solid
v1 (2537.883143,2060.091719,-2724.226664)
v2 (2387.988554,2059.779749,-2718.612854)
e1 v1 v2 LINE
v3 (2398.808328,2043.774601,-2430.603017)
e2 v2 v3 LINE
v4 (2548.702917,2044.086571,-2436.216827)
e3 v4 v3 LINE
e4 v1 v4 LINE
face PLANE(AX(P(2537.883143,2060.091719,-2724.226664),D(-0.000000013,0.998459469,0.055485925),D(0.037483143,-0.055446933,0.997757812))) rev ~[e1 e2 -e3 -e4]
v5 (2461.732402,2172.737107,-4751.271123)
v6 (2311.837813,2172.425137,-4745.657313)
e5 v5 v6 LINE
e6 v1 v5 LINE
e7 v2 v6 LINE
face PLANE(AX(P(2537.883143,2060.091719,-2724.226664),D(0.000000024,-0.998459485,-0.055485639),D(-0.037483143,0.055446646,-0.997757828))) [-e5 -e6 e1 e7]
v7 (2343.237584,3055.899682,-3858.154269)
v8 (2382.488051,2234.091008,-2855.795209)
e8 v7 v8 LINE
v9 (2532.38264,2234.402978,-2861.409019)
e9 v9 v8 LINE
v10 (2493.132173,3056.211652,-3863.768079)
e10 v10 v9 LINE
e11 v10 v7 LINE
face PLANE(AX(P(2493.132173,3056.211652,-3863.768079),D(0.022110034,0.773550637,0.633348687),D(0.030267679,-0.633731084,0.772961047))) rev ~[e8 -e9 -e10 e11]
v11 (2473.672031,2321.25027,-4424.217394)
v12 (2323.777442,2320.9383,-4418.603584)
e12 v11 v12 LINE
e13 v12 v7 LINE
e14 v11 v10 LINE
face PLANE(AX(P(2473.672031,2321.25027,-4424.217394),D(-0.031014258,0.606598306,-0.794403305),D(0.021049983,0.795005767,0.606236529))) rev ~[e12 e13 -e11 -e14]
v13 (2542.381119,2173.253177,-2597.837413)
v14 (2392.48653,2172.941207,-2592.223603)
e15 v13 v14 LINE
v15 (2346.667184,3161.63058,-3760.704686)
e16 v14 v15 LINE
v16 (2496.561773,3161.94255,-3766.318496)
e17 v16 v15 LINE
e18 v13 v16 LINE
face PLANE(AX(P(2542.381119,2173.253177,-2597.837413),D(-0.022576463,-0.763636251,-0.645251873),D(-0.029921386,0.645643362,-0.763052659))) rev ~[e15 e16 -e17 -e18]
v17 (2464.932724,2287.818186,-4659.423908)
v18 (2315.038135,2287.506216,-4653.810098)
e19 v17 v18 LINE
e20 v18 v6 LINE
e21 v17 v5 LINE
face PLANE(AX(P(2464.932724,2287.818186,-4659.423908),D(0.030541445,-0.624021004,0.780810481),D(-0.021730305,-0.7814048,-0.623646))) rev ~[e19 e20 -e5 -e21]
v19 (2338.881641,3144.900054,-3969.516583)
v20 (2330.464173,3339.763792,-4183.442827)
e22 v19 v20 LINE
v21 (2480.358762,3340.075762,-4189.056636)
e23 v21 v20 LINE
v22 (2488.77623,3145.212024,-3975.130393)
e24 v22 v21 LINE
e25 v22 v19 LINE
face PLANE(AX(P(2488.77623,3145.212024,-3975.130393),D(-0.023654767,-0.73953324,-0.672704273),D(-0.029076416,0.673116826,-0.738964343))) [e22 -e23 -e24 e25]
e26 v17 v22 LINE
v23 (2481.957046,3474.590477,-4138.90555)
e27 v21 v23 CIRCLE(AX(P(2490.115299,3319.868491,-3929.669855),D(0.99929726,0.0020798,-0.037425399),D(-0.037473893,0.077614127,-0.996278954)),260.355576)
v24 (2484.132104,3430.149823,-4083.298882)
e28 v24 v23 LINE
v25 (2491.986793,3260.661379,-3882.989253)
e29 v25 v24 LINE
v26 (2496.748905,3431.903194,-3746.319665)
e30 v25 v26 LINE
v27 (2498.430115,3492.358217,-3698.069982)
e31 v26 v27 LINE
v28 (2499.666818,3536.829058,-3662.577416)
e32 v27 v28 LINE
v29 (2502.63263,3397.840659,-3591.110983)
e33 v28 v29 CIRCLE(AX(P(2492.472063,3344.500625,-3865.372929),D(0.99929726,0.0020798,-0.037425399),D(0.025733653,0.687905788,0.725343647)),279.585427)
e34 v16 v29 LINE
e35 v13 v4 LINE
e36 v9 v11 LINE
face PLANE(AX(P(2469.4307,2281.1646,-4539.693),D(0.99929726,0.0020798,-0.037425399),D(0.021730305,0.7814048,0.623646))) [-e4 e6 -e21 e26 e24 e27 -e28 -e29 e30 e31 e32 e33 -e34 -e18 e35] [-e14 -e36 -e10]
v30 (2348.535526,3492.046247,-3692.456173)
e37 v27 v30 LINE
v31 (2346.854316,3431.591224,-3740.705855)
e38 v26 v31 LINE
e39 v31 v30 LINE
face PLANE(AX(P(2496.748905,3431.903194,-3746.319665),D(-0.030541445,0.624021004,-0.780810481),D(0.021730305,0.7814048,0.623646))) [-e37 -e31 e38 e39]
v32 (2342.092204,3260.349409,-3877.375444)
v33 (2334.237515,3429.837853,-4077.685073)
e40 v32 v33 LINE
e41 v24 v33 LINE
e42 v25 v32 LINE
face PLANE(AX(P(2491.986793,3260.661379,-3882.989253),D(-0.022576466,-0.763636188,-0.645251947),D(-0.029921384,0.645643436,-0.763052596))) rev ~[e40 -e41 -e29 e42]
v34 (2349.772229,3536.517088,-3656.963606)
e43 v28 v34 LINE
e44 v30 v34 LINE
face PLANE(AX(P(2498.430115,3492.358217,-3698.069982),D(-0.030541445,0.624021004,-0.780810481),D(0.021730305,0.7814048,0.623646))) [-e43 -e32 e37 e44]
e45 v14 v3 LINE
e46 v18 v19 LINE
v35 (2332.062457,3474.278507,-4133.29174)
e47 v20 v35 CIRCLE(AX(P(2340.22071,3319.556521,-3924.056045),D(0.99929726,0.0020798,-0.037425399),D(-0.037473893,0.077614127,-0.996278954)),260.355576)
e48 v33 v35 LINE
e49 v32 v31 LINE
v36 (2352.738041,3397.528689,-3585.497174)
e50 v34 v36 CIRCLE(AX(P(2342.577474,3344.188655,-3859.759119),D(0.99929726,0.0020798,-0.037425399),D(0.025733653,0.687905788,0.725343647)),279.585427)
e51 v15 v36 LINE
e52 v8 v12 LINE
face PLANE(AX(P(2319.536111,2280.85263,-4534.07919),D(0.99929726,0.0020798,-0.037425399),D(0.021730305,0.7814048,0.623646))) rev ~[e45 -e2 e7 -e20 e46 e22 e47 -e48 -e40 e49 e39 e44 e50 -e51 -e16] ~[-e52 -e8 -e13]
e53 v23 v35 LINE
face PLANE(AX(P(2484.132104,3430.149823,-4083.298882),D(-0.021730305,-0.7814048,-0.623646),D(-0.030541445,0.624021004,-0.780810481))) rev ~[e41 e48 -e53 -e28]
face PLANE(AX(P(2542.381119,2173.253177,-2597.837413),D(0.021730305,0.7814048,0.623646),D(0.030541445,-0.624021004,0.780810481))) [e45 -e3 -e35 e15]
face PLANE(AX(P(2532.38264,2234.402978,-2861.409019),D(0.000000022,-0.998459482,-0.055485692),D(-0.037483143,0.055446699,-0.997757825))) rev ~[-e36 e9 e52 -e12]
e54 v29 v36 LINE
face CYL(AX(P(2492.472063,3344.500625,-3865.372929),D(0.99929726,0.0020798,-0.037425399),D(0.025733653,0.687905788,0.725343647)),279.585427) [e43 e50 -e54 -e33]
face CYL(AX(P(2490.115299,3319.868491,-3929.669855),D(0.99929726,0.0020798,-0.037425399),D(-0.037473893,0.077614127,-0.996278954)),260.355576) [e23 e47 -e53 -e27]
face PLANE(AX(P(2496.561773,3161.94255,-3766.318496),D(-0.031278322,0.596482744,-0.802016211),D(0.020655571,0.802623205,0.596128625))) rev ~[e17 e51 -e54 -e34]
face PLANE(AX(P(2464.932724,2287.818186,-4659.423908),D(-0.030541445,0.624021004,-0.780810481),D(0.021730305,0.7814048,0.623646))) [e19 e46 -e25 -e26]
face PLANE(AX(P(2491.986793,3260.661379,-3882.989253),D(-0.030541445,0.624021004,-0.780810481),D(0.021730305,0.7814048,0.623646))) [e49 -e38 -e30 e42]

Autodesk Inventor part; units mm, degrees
sketch "Sketch1" plane through (0, 0, 0) normal (0, 0, 1) x (1, 0, 0)
  arc A0 (4796.3585, -1909.6289) -> (3343.4744, 1121.5056) centre (-3903.1767, -4215.7265) ccw
  line L0 (3236.8192, 1046.7661) -> (3343.5051, 1121.464)
  arc A1 (3228.7635, 1285.3391) -> (1546.1726, 3076.3751) centre (-4110.5601, -3923.7232) ccw
  line L1 (3228.7635, 1285.3391) -> (3122.0787, 1210.6419)
  line L2 (1372.9503, 3176.3452) -> (1308.1705, 3064.1503)
  arc A2 (1372.9503, 3176.3452) -> (93.8576, 4024.2684) centre (-4221.2651, -3873.8147) ccw
  line L3 (1481.3729, 2964.1457) -> (1546.1726, 3076.3751)
  arc A3 (4543.4821, -2147.4888) -> (93.8528, 3844.2289) centre (-4256.4671, -4034.5221) ccw
  line L4 (93.8576, 4024.2684) -> (93.8528, 3844.2289)
  line L5 (1308.1705, 3064.1503) -> (1481.3729, 2964.1457)
  line L6 (3122.0787, 1210.6419) -> (3236.8192, 1046.7661)
  arc A4 (4543.4821, -2147.4888) -> (4796.3585, -1909.6289) centre (4134.8595, -1459.7188) ccw
  point P0 (0, 0)
  dimension "d7" = 800
ref_plane "Work Plane2" through (0, 0, -8101) normal (0, 0, 1) x (1, 0, 0)
ref_plane "Work Plane1" through (0, 0, 0) normal (0, 0, 1) x (1, 0, 0)
sketch "Sketch2" plane through (0, 0, -8101) normal (0, 0, 1) x (1, 0, 0)
  arc A0 (1192.0552, 3508.338) -> (93.8528, 4294.485) centre (-5164.5547, -4211.3454) ccw projected
  arc A1 (3133.8513, 1483.0798) -> (1365.2603, 3408.338) centre (-5051.6105, -4261.3276) ccw projected
  arc A2 (4543.6426, -2147.8414) -> (93.8528, 4114.0508) centre (-5207.4444, -4365.1147) ccw projected
  line L0 (1192.0552, 3508.338) -> (1126.9741, 3395.6142) projected
  line L1 (1365.2603, 3408.338) -> (1300.1792, 3295.6142) projected
  line L2 (1126.9741, 3395.6142) -> (1300.1792, 3295.6142) projected
  line L3 (93.8528, 4294.485) -> (93.8528, 4114.0508) projected
  line L4 (3027.6129, 1408.6909) -> (3133.8513, 1483.0798) projected
  line L5 (3142.3282, 1244.8605) -> (3248.5665, 1319.2494) projected
  line L6 (3027.6129, 1408.6909) -> (3142.3282, 1244.8605) projected
  arc A3 (4803.6655, -1899.2732) -> (3248.5665, 1319.2494) centre (-4832.968, -4570.4704) ccw projected
  arc A4 (4543.6426, -2147.8414) -> (4803.6655, -1899.2732) centre (4135.0016, -1460.0824) ccw projected
  point P0 (0, 0)
loft "Loft1" add profiles "Sketch1", "Sketch2"
ref_plane "Work Plane3" through (2600, 0, 0) normal (1, 0, 0) x (0, 1, 0)
sketch "Sketch3" plane through (2600, 0, 0) normal (1, 0, 0) x (0, 1, 0)
  line L0 (3120.8038, -3828.6818) -> (2179.9067, -2717.5683)
  line L1 (2179.9067, -2717.5683) -> (2281.1646, -4539.693)
  line L2 (2281.1646, -4539.693) -> (3120.8038, -3828.6818)
  line L3 (4534.6211, 332.5956) -> (-2270.5383, 332.5956)
  line L4 (-2270.5383, 332.5956) -> (-2270.5383, -8394.1003)
  line L5 (-2270.5383, -8394.1003) -> (4534.6211, -8394.1003)
  line L6 (4534.6211, -8394.1003) -> (4534.6211, 332.5956)
  point P0 (0, 0)
extrude "Extrusion1" cut sketch "Sketch3" along normal through all both and the other way through all
sketch "Sketch5" plane through (2219.0112, 2281.1646, -4539.693) normal (0, -0.9984595, -0.0554857) x (1, 0, 0)
  line L0 (318.8718, 1824.936) -> (250.4195, 0)
  point P0 (-2219.0112, 4659.2715)
ref_plane "Work Plane4" through (2537.8831, 2179.9067, -2717.5683) normal (-0.6423359, -0.7662012, -0.0184479) x (-0.0374831, 0.0554467, -0.9977578)
sketch "Sketch6" plane through (2537.8831, 2179.9067, -2717.5683) normal (-0.6423359, -0.7662012, -0.0184479) x (-0.0374831, 0.0554467, -0.9977578)
  line L0 (-729.0595, -1938.3665) -> (2085.591, -1938.3665)
  line L1 (2085.591, -1938.3665) -> (2085.591, 179.9667)
  line L2 (2085.591, 179.9667) -> (-729.0595, 179.9667)
  line L3 (-729.0595, 179.9667) -> (-729.0595, -1938.3665)
  point P0 (-2737.216, -722.0143)
extrude "Extrusion2" cut sketch "Sketch6" against normal through all
ref_plane "Work Plane5" through (2537.8831, 2179.9067, -2717.5683) normal (-0.9992973, -0.0020798, 0.0374254) x (-0.0374831, 0.0554467, -0.9977578)
sketch "Sketch7" plane through (2537.8831, 2179.9067, -2717.5683) normal (-0.9992973, -0.0020798, 0.0374254) x (-0.0374831, 0.0554467, -0.9977578)
  line L0 (1826.2193, 0) -> (0, 0) projected
  line L1 (1201.6643, -877.7967) -> (1826.2193, 0) projected
  line L2 (0, 0) -> (1201.6643, -877.7967) projected
  point P0 (-2737.216, 2025.7624)
sketch "Sketch8" plane through (2537.8831, 2179.9067, -2717.5683) normal (-0.6423359, -0.7662012, -0.0184479) x (-0.0374831, 0.0554467, -0.9977578)
  line L0 (1826.2193, 0) -> (0, 0) projected
  line L1 (1201.6643, -1365.6093) -> (1826.2193, 0) projected
  line L2 (0, 0) -> (1201.6643, -1365.6093) projected
  point P0 (-2737.216, -722.0143)
loft "Loft2" add profiles "Sketch7" section 1 edges at (2503.6569, 2230.5357, -3628.6306) (1958.4447, 2700.9842, -4184.1874) (1992.6709, 2650.3553, -3273.125)
sketch "Sketch9" plane through (2537.8831, 2179.9067, -2717.5683) normal (0.9992973, 0.0020798, -0.0374254) x (-0.0374831, 0.0554467, -0.9977578)
  line L0 (1201.6643, 877.7967) -> (0, 0) projected
  line L1 (1826.2193, 0) -> (0, 0) projected
  line L2 (1826.2193, 0) -> (1201.6643, 877.7967) projected
  point P0 (-2737.216, -2025.7624)
ref_plane "Work Plane6" through (2469.4307, 2281.1646, -4539.693) normal (0.9992973, 0.0020798, -0.0374254) x (0.0217303, 0.7814048, 0.623646)
sketch "Sketch10" plane through (2469.4307, 2281.1646, -4539.693) normal (0.9992973, 0.0020798, -0.0374254) x (0.0217303, 0.7814048, 0.623646)
  line L0 (1578.0672, -786.8916) -> (-983.5577, -786.8916)
  line L1 (-983.5577, -786.8916) -> (-983.5577, 1970.9014)
  line L2 (-983.5577, 1970.9014) -> (1578.0672, 1970.9014)
  line L3 (1578.0672, 1970.9014) -> (1578.0672, -786.8916)
  point P0 (994.987, 4892.7146)
extrude "Extrusion3" cut sketch "Sketch10" against normal through all
sketch "Sketch11" plane through (2469.4307, 2281.1646, -4539.693) normal (0.9992973, 0.0020798, -0.0374254) x (0.0217303, 0.7814048, 0.623646)
  line L0 (1027.6784, 44.8475) -> (1011.4833, 1341.5246)
  line L1 (1011.4833, 1341.5246) -> (103.4312, 65.2798)
  line L2 (103.4312, 65.2798) -> (1027.6784, 44.8475)
  line L3 (960.9484, 1557.5799) -> (-216.8429, -97.7765)
  line L4 (960.9484, 1557.5799) -> (1128.2932, 1792.779)
  line L5 (1128.2932, 1585.7882) -> (1128.2932, 1792.779)
  line L6 (-69.5683, -97.7765) -> (-216.8429, -97.7765)
  line L7 (1027.6784, -97.7765) -> (1046.3487, -386.6685)
  line L8 (1182.7704, -360.1846) -> (1182.7704, -431.4012)
  arc A0 (1046.3487, -386.6685) -> (1182.7704, -431.4012) centre (1192.5364, -171.2284) ccw
  line L9 (1394.5704, -97.7765) -> (1471.9375, -97.7765)
  line L10 (1171.1456, 55.0636) -> (1464.8769, 44.8475)
  line L11 (1471.9375, -97.7765) -> (1528.8489, -97.7765)
  arc A1 (1528.8489, -97.7765) -> (1464.8769, 44.8475) centre (1251.9333, -136.3242) ccw
  line L12 (1128.2932, 1585.7882) -> (1171.1456, 55.0636)
  line L13 (1175.4243, -97.7765) -> (1182.7704, -360.1846)
  line L14 (-69.5683, -97.7765) -> (1027.6784, -97.7765)
  line L15 (1175.4243, -97.7765) -> (1394.5704, -97.7765)
  point P0 (994.987, 4892.7146)
  point P1 (1077.3097, 0)
  point P2 (1058.7249, 1488.0116)
  point P3 (0, 0)
extrude "Extrusion4" add sketch "Sketch11" against normal blind 150
properties part number "panel_block_03" material "Wood (Maple)"
